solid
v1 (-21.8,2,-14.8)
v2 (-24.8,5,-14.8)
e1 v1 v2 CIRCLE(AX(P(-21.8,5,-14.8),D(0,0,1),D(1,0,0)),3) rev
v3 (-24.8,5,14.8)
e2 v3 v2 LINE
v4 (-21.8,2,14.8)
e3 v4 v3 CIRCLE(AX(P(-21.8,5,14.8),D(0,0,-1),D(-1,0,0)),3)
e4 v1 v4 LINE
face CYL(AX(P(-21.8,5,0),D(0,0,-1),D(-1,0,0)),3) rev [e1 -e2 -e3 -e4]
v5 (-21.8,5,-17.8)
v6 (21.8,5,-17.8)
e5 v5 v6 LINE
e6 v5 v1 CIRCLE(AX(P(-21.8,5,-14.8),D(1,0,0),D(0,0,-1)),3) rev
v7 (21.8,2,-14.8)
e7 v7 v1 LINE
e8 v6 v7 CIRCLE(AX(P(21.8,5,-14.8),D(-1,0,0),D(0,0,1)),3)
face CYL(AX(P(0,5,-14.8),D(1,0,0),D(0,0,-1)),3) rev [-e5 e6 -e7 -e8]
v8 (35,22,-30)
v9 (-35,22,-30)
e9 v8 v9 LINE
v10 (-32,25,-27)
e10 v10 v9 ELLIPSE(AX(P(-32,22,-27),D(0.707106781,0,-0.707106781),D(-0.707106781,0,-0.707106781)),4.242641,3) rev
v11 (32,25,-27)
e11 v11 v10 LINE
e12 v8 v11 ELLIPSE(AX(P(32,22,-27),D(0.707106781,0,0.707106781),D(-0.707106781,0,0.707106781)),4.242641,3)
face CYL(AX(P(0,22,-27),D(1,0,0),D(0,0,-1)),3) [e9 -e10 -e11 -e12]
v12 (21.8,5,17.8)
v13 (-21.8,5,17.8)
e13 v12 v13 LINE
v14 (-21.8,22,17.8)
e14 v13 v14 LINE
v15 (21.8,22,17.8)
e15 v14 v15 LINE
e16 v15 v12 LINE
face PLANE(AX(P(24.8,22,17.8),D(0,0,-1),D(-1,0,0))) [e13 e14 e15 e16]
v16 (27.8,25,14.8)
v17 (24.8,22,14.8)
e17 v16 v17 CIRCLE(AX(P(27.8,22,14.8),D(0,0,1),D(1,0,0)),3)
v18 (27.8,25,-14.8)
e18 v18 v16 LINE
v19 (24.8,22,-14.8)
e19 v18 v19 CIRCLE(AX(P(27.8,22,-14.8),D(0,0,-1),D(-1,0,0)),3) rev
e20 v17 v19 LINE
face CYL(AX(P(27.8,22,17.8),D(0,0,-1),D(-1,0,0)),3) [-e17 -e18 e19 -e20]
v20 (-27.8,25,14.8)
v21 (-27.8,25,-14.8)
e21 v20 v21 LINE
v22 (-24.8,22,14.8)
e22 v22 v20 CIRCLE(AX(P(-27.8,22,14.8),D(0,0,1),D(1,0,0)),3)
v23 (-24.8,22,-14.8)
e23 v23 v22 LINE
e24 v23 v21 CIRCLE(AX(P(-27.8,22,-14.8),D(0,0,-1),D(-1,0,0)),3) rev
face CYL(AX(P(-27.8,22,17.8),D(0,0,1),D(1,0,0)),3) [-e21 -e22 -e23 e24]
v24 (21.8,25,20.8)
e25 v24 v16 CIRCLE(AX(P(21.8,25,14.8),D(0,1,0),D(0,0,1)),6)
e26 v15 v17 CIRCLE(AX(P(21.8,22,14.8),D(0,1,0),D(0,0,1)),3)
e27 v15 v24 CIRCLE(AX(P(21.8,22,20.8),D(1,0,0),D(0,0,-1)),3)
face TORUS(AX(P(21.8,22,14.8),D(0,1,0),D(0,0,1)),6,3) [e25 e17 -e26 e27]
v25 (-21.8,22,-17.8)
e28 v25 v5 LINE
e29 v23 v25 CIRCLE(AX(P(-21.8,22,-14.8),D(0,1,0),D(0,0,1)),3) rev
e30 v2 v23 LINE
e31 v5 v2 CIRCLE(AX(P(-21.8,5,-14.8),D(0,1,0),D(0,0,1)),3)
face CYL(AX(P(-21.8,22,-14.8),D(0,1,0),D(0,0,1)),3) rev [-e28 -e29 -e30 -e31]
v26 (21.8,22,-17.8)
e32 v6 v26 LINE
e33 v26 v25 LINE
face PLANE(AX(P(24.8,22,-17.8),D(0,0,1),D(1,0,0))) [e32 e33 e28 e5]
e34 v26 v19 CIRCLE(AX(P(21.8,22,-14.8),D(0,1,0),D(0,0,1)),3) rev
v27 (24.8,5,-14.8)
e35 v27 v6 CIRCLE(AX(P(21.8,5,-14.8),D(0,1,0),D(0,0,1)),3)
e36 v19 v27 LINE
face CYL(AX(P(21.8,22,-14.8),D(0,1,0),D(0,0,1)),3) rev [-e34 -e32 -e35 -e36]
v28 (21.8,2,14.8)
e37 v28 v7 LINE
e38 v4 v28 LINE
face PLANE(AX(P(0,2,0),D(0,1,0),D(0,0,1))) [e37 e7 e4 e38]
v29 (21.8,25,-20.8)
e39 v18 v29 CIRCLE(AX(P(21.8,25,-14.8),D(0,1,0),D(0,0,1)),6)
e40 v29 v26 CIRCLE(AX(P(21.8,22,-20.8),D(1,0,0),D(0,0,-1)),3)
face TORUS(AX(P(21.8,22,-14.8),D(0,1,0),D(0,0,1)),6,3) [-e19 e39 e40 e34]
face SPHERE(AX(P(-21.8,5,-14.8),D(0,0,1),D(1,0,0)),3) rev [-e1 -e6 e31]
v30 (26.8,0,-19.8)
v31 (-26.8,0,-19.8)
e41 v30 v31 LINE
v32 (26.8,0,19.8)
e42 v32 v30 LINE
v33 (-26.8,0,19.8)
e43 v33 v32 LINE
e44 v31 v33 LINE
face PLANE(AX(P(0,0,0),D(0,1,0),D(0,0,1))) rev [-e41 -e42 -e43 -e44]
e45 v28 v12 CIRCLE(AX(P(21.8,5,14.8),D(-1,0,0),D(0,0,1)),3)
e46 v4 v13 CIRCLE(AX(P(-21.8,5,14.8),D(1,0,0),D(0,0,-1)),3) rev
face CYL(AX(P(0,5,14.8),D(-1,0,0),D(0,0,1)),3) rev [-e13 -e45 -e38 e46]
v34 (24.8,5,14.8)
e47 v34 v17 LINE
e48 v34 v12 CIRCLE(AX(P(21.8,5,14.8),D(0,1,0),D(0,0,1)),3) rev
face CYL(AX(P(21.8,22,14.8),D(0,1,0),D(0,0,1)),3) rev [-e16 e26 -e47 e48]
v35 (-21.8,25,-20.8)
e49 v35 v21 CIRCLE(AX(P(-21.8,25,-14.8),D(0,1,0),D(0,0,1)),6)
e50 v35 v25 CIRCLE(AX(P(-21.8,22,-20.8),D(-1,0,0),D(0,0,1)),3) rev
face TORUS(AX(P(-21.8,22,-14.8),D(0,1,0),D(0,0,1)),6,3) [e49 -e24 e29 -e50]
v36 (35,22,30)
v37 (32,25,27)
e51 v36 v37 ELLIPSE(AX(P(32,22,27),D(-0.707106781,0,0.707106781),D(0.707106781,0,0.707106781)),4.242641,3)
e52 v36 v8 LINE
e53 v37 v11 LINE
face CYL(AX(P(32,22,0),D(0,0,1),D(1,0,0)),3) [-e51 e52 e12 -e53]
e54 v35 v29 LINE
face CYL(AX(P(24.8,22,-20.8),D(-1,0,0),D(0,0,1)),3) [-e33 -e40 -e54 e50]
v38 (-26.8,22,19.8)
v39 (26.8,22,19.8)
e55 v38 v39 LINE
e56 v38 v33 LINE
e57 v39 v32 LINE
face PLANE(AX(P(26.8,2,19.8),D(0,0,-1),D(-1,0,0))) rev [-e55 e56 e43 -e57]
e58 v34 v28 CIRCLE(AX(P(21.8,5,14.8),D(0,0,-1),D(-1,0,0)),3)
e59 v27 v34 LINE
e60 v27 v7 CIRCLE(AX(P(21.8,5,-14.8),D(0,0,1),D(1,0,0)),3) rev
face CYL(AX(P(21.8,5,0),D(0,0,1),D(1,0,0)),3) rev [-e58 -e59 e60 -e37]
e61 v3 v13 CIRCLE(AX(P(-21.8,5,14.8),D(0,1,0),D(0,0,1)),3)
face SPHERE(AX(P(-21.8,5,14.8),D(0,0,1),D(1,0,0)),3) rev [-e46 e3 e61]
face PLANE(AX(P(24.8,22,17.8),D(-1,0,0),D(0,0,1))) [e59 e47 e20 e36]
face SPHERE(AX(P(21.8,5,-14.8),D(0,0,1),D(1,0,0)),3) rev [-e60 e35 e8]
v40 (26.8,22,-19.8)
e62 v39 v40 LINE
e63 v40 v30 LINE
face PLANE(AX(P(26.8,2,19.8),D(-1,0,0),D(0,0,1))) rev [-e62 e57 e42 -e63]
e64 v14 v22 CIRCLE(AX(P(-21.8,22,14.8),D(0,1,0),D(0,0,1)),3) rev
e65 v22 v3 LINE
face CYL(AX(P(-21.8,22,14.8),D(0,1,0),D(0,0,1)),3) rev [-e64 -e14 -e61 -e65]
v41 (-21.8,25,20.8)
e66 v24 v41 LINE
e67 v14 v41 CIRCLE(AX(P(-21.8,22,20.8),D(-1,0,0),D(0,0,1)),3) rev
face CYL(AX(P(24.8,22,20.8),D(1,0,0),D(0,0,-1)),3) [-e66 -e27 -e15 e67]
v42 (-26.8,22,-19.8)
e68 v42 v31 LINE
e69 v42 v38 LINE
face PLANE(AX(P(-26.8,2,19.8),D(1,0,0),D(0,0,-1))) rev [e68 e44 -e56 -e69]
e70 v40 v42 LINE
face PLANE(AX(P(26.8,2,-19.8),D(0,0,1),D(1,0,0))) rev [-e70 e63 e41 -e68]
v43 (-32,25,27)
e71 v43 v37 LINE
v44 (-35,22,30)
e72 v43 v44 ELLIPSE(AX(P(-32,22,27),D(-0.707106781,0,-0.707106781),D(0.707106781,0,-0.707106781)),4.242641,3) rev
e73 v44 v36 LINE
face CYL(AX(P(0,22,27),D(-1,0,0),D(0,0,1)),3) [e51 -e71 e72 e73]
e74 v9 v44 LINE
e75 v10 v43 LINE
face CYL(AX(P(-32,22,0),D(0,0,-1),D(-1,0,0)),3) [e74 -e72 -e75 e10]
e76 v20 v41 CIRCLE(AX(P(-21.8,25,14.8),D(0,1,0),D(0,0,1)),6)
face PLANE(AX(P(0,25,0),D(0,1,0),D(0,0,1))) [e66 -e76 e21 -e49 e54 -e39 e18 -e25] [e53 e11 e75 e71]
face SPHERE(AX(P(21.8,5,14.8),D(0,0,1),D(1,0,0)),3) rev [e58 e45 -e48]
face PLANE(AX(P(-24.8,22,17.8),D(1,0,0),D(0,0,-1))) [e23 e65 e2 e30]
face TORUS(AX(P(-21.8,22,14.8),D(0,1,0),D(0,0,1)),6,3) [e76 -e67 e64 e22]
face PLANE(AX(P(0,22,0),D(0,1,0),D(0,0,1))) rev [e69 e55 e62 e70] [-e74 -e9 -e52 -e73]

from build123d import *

# Parameters (mm, degrees)
SKETCH1_W           = 53.6
SKETCH1_H           = 39.6
BOSS_EXTRUDE1_DEPTH = 2
SKETCH2_W           = 53.6
SKETCH2_H           = 39.6
SKETCH2_W_2         = 49.6
SKETCH2_H_2         = 35.6
BOSS_EXTRUDE2_DEPTH = 20
SKETCH3_W           = 70
SKETCH3_H           = 60
SKETCH3_W_2         = 49.6
SKETCH3_H_2         = 35.6
BOSS_EXTRUDE3_DEPTH = 3
FILLET1_R           = 3


with BuildPart() as part:
    # Sketch1 → Boss-Extrude1 (new body)
    with BuildSketch(Plane(origin=(0, 0, 0), x_dir=(1, 0, 0), z_dir=(0, 1, 0))):
        Rectangle(SKETCH1_W, SKETCH1_H)
    extrude(amount=BOSS_EXTRUDE1_DEPTH)

    # Sketch2 → Boss-Extrude2 (add)
    with BuildSketch(Plane(origin=(0, 2, 0), x_dir=(1, 0, 0), z_dir=(0, 1, 0))):
        Rectangle(SKETCH2_W, SKETCH2_H)
        Rectangle(SKETCH2_W_2, SKETCH2_H_2, mode=Mode.SUBTRACT)
    extrude(amount=BOSS_EXTRUDE2_DEPTH)

    # Sketch3 → Boss-Extrude3 (add)
    with BuildSketch(Plane(origin=(0, 22, 0), x_dir=(1, 0, 0), z_dir=(0, 1, 0))):
        Rectangle(SKETCH3_W, SKETCH3_H)
        Rectangle(SKETCH3_W_2, SKETCH3_H_2, mode=Mode.SUBTRACT)
    extrude(amount=BOSS_EXTRUDE3_DEPTH)

    # Fillet1
    fillet1_edges = [part.edges().sort_by_distance(p)[0] for p in [
        (24.8, 13.5, 17.8),
        (0, 25, 17.8),
        (-24.8, 13.5, 17.8),
        (0, 2, 17.8),
        (24.8, 13.5, -17.8),
        (-24.8, 13.5, -17.8),
        (24.8, 2, 0),
        (-24.8, 2, 0),
        (0, 2, -17.8),
        (24.8, 25, 0),
        (0, 25, -17.8),
        (-24.8, 25, 0),
        (0, 25, 30),
        (0, 25, -30),
        (35, 25, 0),
        (-35, 25, 0),
    ]]
    fillet(fillet1_edges, radius=FILLET1_R - 0.0001)  # a hair under: the kernel refuses the full size


solid = part.part
